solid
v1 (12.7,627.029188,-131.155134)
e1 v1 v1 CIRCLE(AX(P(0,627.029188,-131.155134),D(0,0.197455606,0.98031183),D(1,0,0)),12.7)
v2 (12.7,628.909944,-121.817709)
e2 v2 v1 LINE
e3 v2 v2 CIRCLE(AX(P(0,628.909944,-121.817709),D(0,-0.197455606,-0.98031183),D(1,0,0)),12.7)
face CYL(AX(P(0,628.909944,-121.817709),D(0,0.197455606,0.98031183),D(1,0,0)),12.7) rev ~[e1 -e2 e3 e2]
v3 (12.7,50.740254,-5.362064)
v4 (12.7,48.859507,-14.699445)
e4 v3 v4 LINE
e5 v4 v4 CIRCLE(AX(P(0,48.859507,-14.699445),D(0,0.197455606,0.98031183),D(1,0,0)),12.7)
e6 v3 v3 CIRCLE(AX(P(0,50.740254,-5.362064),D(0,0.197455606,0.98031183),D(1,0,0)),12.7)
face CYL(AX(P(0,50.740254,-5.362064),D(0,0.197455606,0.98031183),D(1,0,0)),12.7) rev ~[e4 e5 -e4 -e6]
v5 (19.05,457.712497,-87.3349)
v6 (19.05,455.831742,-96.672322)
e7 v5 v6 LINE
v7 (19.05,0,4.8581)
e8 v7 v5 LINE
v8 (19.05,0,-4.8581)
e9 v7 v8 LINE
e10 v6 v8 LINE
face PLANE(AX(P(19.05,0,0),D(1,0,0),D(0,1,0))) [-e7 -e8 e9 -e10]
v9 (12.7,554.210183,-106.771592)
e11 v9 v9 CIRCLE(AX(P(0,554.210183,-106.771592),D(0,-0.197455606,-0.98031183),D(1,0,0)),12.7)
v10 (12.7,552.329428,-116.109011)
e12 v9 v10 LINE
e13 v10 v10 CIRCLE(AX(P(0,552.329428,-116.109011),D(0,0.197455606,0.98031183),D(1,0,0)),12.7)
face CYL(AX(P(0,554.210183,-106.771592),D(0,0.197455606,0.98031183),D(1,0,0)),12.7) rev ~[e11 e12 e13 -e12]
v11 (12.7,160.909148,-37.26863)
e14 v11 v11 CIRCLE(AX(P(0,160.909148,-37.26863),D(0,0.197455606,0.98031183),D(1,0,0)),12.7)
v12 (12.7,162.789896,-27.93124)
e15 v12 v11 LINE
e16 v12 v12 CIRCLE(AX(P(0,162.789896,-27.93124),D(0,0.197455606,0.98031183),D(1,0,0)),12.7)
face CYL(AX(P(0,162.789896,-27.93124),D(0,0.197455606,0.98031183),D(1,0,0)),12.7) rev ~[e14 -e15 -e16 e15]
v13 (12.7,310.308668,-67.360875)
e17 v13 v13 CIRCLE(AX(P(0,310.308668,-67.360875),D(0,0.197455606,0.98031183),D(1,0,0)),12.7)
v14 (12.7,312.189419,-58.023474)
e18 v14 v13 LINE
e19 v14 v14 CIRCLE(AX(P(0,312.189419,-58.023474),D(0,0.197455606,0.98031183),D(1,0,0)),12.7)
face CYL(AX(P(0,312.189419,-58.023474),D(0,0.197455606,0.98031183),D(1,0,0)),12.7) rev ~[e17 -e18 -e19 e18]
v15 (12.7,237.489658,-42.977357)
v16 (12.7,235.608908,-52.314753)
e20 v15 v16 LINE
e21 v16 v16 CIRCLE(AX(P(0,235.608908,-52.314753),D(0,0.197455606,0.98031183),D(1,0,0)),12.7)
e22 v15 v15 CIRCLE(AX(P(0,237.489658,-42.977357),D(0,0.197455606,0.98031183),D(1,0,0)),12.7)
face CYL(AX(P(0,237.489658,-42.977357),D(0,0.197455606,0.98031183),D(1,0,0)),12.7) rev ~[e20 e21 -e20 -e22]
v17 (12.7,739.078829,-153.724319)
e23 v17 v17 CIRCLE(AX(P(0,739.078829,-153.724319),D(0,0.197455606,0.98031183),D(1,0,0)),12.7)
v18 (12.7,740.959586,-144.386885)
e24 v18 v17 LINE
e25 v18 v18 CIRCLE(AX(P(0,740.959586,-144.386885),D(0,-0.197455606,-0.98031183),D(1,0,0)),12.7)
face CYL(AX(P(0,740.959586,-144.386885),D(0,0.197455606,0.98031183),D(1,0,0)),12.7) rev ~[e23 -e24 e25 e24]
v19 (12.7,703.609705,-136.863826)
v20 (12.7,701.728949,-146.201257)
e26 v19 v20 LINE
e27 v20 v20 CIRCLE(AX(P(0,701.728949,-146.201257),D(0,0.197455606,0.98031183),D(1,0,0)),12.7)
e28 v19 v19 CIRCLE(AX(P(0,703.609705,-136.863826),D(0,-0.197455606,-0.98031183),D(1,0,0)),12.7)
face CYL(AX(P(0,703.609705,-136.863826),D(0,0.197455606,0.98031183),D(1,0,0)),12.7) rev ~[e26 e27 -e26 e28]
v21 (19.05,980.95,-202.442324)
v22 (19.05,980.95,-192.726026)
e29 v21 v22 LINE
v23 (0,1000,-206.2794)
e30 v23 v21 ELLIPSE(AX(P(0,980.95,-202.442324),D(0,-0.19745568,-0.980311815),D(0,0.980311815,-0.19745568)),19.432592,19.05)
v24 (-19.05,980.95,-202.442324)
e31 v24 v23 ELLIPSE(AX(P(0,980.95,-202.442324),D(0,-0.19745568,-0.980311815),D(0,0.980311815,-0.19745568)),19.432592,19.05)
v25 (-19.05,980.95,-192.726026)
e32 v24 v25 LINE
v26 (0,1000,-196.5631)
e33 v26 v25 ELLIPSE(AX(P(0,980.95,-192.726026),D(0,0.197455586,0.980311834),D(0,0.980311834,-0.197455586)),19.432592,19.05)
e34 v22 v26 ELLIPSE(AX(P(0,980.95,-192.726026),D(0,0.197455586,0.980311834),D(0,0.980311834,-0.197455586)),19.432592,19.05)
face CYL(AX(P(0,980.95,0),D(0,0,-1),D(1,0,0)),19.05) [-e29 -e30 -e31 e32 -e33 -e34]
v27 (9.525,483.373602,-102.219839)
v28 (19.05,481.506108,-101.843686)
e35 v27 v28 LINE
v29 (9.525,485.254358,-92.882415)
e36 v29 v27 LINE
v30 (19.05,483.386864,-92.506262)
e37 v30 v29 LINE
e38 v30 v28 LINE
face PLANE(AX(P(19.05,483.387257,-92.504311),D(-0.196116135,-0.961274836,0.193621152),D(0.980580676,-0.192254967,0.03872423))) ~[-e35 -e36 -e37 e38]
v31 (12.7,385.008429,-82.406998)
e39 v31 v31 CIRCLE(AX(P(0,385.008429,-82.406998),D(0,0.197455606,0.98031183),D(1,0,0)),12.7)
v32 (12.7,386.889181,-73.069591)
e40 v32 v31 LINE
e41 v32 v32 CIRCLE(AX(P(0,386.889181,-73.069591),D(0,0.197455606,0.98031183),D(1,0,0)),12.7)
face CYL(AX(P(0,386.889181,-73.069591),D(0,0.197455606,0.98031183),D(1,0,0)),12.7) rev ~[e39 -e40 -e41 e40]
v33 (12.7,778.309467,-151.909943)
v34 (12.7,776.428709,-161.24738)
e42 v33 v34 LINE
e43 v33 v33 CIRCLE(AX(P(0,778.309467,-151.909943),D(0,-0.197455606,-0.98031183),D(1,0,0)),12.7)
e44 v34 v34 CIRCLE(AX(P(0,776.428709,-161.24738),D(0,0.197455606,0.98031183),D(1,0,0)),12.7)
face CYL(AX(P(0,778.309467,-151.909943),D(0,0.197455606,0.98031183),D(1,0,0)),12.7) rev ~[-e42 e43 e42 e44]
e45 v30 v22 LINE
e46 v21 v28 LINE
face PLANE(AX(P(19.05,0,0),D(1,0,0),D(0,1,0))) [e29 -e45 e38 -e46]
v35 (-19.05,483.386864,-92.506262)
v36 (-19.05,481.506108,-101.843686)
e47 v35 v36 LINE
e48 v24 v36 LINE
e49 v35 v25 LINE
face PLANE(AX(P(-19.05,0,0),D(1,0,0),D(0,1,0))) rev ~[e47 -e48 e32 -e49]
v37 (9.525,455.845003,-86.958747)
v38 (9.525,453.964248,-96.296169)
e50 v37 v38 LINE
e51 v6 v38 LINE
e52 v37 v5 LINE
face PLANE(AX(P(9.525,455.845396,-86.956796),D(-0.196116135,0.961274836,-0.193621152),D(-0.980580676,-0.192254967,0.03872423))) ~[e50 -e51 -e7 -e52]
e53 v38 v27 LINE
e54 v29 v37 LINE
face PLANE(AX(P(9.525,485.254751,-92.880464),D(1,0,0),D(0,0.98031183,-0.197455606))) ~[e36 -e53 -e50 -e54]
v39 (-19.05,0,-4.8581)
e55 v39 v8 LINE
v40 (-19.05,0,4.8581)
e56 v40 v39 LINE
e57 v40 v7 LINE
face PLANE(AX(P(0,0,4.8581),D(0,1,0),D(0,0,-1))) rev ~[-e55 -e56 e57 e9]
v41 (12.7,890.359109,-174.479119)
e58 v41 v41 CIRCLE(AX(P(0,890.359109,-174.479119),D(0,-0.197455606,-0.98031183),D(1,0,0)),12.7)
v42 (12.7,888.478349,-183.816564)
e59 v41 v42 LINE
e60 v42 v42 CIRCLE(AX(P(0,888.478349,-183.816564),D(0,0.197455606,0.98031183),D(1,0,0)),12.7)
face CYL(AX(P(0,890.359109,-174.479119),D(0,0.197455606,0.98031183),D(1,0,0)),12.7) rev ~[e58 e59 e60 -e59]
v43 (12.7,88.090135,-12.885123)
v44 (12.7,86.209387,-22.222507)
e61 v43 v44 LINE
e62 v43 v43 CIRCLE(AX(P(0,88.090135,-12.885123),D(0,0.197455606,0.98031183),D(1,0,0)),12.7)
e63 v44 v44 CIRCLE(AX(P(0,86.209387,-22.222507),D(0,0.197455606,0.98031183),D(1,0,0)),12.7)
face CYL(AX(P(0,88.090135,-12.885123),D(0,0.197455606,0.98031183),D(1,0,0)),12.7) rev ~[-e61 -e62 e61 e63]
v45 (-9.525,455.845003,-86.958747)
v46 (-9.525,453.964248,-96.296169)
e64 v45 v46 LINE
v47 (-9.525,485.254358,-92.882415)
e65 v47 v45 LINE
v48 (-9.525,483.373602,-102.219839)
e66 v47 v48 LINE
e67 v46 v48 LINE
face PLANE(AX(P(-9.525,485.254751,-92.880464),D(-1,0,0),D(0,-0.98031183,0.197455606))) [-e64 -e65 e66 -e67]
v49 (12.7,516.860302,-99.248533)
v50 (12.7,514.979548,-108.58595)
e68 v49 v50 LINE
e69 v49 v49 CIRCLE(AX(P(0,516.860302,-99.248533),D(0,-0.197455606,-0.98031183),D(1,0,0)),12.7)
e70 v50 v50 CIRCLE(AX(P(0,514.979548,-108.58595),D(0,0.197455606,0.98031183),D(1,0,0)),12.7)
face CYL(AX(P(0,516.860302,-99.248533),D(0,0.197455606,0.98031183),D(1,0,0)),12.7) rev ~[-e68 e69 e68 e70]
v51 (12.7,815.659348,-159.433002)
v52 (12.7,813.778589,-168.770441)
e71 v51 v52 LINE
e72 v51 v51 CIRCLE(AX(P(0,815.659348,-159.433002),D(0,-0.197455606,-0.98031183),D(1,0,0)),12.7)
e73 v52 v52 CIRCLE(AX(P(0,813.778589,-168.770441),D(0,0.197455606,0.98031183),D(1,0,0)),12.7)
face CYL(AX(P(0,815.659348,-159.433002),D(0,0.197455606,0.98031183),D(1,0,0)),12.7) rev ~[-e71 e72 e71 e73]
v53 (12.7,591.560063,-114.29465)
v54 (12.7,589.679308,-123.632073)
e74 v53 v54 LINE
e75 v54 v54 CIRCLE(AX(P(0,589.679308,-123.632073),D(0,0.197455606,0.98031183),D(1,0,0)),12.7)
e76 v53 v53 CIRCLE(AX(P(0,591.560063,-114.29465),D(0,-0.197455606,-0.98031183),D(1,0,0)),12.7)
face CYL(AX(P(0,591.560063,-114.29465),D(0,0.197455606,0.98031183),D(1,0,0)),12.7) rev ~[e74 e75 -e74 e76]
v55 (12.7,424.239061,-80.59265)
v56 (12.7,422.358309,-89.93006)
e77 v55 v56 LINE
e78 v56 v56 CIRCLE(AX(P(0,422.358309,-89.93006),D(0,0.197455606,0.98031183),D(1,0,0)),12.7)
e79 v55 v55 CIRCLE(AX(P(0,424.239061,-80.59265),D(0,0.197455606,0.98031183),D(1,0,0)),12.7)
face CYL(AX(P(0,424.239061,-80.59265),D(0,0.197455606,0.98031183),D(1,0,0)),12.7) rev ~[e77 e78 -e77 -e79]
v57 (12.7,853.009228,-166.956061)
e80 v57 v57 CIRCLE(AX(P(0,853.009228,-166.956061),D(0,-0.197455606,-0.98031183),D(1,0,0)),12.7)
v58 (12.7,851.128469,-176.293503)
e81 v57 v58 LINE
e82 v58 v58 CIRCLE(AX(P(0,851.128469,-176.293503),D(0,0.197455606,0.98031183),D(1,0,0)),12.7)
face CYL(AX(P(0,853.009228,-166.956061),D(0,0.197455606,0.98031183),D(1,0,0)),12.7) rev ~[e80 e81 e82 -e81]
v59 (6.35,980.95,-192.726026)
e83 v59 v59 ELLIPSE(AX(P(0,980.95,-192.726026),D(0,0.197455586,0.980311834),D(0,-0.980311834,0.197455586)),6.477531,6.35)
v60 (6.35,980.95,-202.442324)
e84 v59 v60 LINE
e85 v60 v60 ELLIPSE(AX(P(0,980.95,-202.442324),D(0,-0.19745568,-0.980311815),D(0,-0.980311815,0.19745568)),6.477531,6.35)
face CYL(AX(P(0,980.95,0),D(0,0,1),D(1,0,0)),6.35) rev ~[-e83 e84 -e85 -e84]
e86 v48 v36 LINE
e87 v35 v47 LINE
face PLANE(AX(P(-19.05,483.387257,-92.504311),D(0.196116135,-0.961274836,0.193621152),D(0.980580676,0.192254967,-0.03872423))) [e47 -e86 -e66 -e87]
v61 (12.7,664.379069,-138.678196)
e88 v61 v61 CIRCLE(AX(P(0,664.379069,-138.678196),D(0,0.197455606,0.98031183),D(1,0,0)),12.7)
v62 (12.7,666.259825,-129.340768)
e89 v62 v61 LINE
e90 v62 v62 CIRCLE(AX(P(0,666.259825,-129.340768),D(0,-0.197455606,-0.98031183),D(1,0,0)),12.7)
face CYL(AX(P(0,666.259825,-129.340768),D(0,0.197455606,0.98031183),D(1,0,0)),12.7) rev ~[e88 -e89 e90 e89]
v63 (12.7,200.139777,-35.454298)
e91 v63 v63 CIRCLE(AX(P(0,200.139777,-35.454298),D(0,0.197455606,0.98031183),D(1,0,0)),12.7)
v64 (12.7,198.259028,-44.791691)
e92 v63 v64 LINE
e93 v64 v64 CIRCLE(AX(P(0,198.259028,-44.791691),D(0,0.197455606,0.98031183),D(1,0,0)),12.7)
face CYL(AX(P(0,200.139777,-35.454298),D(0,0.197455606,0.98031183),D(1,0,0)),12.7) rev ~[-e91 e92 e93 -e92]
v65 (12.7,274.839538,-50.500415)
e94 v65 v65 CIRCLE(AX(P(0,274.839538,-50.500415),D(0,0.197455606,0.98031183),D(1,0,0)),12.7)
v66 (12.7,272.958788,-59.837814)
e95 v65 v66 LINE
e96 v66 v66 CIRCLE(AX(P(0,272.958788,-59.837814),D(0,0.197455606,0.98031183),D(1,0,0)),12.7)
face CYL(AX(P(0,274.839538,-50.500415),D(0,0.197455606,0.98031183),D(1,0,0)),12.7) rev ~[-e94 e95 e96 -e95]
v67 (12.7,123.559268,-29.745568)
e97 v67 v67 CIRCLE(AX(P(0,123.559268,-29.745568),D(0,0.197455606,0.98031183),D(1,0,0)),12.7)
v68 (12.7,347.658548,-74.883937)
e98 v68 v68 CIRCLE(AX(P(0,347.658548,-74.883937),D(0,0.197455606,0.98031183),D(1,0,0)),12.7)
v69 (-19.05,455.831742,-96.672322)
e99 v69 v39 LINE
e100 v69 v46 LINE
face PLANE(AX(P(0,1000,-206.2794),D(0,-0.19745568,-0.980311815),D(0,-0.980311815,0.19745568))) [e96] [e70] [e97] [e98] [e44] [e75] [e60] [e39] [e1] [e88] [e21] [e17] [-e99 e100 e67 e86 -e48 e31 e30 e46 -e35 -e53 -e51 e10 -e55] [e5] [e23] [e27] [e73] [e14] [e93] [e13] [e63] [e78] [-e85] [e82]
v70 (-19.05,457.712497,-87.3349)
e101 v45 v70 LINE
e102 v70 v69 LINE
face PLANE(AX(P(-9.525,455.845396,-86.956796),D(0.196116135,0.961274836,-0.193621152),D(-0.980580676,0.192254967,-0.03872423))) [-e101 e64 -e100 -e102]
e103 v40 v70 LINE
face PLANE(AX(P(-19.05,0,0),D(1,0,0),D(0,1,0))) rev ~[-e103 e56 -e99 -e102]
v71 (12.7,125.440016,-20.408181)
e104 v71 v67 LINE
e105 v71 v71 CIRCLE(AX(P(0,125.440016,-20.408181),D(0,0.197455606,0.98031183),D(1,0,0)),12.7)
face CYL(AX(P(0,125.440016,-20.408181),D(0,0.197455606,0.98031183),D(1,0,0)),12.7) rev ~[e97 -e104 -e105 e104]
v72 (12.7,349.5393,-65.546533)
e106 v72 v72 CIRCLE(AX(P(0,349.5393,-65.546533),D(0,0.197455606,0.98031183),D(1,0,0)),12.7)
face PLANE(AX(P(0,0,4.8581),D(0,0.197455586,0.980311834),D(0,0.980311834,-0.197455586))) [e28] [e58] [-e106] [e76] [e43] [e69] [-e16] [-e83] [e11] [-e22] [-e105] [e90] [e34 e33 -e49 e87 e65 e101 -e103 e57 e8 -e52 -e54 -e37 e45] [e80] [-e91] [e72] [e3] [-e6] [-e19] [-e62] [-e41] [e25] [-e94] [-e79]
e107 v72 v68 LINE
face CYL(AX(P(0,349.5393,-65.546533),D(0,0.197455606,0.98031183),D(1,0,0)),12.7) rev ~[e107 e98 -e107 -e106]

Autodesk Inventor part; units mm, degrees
ref_plane "YZ Plane" through (0, 0, 0) normal (1, 0, 0) x (0, 1, 0)
ref_plane "XZ Plane" through (0, 0, 0) normal (0, 1, 0) x (-1, 0, 0)
ref_plane "XY Plane" through (0, 0, 0) normal (0, 0, 1) x (1, 0, 0)
sketch "Sketch1" plane through (0, 0, 0) normal (1, 0, 0) x (0, 1, 0)
  line L0 (0, 4.8581) -> (0, -4.8581)
  line L1 (0, 4.8581) -> (1000, -196.5631)
  line L2 (1000, -196.5631) -> (1000, -206.2794)
  line L3 (1000, -206.2794) -> (0, -4.8581)
  line L4 (0, 4.8581) -> (-1.8808, -4.4793) construction
  line L5 (-1.8808, -4.4793) -> (0, -4.8581) construction
  point P0 (0, 0)
  point P1 (0, 0)
  dimension "d0" = 9.525
  dimension "d1" = 1000
  dimension "d9" = 211.1375
  dimension "d10" = 78.612
extrude "Extrusion1" add sketch "Sketch1" along normal mid plane 38.1
sketch "Sketch2" plane through (0, 0, 0) normal (0, 0, 1) x (1, 0, 0)
  circle A0 centre (0, 980.95) radius 6.35
  circle A1 centre (0, 980.95) radius 19.05
  line L0 (19.05, 1000) -> (19.05, 0) projected
  line L1 (-19.05, 1000) -> (19.05, 1000) projected
  line L2 (-19.05, 1000) -> (-19.05, 980.95)
  point P0 (0, 0)
  point P1 (0, 1000)
  point P2 (19.05, 980.95)
  dimension "d5" = 38.1
  dimension "d6" = 12.7
extrude "Extrusion2" cut sketch "Sketch2" along normal through all both and the other way through all contours A0 | L2 L1 A1 | A1 L1 L0
sketch "Sketch3" plane through (-19.05, 0, 4.8581) normal (0, 0.1974556, 0.9803118) x (1, 0, 0)
  line L0 (0, 1002.5695) -> (0, 1.9185) projected
  line L1 (0, 493.095) -> (9.525, 495)
  line L2 (9.525, 495) -> (9.525, 465)
  line L3 (9.525, 465) -> (0, 466.905)
  line L4 (38.1, 0) -> (0, 0) projected
  line L5 (0, 493.095) -> (9.525, 493.095) construction
  point P0 (19.05, 0.9593)
  point P1 (9.525, 480)
  dimension "d11" = 9.525
  dimension "d12" = 480
  dimension "d14" = 1.905
  dimension "d15" = 30
extrude "Extrusion3" cut sketch "Sketch3" against normal blind 10
mirror "Mirror1" about plane through (0, 0, 0) normal (1, 0, 0) of "Extrusion3"
sketch "Sketch4" plane through (-19.05, 0, 4.8581) normal (0, 0.1974556, 0.9803118) x (1, 0, 0)
  circle A0 centre (19.05, 51.7593) radius 12.7
  line L0 (38.1, 466.905) -> (38.1, 0) projected
  circle A1 centre (19.05, 89.8593) radius 12.7
  circle A2 centre (19.05, 127.9593) radius 12.7
  circle A3 centre (19.05, 166.0593) radius 12.7
  circle A4 centre (19.05, 204.1593) radius 12.7
  circle A5 centre (19.05, 242.2593) radius 12.7
  circle A6 centre (19.05, 280.3593) radius 12.7
  circle A7 centre (19.05, 318.4593) radius 12.7
  circle A8 centre (19.05, 356.5593) radius 12.7
  circle A9 centre (19.05, 394.6593) radius 12.7
  circle A10 centre (19.05, 432.7593) radius 12.7
  point P0 (19.05, 0.9593)
  dimension "d18" = 25.4
  dimension "d19" = 50.8
  dimension "d22" = 38.1
extrude "Extrusion4" cut sketch "Sketch4" against normal through all
ref_plane "Work Plane1" through (-9.525, 470.5497, -89.9205) normal (0, 0.9803118, -0.1974556) x (-1, 0, 0)
mirror "Mirror2" about plane through (-9.525, 470.5497, -89.9205) normal (0, 0.9803118, -0.1974556) of "Extrusion4"
equation "\"d14\" = 0.2 * d11"
properties part number "UPRIGHTS_TREBUCHET" material "Wood (Birch)"
